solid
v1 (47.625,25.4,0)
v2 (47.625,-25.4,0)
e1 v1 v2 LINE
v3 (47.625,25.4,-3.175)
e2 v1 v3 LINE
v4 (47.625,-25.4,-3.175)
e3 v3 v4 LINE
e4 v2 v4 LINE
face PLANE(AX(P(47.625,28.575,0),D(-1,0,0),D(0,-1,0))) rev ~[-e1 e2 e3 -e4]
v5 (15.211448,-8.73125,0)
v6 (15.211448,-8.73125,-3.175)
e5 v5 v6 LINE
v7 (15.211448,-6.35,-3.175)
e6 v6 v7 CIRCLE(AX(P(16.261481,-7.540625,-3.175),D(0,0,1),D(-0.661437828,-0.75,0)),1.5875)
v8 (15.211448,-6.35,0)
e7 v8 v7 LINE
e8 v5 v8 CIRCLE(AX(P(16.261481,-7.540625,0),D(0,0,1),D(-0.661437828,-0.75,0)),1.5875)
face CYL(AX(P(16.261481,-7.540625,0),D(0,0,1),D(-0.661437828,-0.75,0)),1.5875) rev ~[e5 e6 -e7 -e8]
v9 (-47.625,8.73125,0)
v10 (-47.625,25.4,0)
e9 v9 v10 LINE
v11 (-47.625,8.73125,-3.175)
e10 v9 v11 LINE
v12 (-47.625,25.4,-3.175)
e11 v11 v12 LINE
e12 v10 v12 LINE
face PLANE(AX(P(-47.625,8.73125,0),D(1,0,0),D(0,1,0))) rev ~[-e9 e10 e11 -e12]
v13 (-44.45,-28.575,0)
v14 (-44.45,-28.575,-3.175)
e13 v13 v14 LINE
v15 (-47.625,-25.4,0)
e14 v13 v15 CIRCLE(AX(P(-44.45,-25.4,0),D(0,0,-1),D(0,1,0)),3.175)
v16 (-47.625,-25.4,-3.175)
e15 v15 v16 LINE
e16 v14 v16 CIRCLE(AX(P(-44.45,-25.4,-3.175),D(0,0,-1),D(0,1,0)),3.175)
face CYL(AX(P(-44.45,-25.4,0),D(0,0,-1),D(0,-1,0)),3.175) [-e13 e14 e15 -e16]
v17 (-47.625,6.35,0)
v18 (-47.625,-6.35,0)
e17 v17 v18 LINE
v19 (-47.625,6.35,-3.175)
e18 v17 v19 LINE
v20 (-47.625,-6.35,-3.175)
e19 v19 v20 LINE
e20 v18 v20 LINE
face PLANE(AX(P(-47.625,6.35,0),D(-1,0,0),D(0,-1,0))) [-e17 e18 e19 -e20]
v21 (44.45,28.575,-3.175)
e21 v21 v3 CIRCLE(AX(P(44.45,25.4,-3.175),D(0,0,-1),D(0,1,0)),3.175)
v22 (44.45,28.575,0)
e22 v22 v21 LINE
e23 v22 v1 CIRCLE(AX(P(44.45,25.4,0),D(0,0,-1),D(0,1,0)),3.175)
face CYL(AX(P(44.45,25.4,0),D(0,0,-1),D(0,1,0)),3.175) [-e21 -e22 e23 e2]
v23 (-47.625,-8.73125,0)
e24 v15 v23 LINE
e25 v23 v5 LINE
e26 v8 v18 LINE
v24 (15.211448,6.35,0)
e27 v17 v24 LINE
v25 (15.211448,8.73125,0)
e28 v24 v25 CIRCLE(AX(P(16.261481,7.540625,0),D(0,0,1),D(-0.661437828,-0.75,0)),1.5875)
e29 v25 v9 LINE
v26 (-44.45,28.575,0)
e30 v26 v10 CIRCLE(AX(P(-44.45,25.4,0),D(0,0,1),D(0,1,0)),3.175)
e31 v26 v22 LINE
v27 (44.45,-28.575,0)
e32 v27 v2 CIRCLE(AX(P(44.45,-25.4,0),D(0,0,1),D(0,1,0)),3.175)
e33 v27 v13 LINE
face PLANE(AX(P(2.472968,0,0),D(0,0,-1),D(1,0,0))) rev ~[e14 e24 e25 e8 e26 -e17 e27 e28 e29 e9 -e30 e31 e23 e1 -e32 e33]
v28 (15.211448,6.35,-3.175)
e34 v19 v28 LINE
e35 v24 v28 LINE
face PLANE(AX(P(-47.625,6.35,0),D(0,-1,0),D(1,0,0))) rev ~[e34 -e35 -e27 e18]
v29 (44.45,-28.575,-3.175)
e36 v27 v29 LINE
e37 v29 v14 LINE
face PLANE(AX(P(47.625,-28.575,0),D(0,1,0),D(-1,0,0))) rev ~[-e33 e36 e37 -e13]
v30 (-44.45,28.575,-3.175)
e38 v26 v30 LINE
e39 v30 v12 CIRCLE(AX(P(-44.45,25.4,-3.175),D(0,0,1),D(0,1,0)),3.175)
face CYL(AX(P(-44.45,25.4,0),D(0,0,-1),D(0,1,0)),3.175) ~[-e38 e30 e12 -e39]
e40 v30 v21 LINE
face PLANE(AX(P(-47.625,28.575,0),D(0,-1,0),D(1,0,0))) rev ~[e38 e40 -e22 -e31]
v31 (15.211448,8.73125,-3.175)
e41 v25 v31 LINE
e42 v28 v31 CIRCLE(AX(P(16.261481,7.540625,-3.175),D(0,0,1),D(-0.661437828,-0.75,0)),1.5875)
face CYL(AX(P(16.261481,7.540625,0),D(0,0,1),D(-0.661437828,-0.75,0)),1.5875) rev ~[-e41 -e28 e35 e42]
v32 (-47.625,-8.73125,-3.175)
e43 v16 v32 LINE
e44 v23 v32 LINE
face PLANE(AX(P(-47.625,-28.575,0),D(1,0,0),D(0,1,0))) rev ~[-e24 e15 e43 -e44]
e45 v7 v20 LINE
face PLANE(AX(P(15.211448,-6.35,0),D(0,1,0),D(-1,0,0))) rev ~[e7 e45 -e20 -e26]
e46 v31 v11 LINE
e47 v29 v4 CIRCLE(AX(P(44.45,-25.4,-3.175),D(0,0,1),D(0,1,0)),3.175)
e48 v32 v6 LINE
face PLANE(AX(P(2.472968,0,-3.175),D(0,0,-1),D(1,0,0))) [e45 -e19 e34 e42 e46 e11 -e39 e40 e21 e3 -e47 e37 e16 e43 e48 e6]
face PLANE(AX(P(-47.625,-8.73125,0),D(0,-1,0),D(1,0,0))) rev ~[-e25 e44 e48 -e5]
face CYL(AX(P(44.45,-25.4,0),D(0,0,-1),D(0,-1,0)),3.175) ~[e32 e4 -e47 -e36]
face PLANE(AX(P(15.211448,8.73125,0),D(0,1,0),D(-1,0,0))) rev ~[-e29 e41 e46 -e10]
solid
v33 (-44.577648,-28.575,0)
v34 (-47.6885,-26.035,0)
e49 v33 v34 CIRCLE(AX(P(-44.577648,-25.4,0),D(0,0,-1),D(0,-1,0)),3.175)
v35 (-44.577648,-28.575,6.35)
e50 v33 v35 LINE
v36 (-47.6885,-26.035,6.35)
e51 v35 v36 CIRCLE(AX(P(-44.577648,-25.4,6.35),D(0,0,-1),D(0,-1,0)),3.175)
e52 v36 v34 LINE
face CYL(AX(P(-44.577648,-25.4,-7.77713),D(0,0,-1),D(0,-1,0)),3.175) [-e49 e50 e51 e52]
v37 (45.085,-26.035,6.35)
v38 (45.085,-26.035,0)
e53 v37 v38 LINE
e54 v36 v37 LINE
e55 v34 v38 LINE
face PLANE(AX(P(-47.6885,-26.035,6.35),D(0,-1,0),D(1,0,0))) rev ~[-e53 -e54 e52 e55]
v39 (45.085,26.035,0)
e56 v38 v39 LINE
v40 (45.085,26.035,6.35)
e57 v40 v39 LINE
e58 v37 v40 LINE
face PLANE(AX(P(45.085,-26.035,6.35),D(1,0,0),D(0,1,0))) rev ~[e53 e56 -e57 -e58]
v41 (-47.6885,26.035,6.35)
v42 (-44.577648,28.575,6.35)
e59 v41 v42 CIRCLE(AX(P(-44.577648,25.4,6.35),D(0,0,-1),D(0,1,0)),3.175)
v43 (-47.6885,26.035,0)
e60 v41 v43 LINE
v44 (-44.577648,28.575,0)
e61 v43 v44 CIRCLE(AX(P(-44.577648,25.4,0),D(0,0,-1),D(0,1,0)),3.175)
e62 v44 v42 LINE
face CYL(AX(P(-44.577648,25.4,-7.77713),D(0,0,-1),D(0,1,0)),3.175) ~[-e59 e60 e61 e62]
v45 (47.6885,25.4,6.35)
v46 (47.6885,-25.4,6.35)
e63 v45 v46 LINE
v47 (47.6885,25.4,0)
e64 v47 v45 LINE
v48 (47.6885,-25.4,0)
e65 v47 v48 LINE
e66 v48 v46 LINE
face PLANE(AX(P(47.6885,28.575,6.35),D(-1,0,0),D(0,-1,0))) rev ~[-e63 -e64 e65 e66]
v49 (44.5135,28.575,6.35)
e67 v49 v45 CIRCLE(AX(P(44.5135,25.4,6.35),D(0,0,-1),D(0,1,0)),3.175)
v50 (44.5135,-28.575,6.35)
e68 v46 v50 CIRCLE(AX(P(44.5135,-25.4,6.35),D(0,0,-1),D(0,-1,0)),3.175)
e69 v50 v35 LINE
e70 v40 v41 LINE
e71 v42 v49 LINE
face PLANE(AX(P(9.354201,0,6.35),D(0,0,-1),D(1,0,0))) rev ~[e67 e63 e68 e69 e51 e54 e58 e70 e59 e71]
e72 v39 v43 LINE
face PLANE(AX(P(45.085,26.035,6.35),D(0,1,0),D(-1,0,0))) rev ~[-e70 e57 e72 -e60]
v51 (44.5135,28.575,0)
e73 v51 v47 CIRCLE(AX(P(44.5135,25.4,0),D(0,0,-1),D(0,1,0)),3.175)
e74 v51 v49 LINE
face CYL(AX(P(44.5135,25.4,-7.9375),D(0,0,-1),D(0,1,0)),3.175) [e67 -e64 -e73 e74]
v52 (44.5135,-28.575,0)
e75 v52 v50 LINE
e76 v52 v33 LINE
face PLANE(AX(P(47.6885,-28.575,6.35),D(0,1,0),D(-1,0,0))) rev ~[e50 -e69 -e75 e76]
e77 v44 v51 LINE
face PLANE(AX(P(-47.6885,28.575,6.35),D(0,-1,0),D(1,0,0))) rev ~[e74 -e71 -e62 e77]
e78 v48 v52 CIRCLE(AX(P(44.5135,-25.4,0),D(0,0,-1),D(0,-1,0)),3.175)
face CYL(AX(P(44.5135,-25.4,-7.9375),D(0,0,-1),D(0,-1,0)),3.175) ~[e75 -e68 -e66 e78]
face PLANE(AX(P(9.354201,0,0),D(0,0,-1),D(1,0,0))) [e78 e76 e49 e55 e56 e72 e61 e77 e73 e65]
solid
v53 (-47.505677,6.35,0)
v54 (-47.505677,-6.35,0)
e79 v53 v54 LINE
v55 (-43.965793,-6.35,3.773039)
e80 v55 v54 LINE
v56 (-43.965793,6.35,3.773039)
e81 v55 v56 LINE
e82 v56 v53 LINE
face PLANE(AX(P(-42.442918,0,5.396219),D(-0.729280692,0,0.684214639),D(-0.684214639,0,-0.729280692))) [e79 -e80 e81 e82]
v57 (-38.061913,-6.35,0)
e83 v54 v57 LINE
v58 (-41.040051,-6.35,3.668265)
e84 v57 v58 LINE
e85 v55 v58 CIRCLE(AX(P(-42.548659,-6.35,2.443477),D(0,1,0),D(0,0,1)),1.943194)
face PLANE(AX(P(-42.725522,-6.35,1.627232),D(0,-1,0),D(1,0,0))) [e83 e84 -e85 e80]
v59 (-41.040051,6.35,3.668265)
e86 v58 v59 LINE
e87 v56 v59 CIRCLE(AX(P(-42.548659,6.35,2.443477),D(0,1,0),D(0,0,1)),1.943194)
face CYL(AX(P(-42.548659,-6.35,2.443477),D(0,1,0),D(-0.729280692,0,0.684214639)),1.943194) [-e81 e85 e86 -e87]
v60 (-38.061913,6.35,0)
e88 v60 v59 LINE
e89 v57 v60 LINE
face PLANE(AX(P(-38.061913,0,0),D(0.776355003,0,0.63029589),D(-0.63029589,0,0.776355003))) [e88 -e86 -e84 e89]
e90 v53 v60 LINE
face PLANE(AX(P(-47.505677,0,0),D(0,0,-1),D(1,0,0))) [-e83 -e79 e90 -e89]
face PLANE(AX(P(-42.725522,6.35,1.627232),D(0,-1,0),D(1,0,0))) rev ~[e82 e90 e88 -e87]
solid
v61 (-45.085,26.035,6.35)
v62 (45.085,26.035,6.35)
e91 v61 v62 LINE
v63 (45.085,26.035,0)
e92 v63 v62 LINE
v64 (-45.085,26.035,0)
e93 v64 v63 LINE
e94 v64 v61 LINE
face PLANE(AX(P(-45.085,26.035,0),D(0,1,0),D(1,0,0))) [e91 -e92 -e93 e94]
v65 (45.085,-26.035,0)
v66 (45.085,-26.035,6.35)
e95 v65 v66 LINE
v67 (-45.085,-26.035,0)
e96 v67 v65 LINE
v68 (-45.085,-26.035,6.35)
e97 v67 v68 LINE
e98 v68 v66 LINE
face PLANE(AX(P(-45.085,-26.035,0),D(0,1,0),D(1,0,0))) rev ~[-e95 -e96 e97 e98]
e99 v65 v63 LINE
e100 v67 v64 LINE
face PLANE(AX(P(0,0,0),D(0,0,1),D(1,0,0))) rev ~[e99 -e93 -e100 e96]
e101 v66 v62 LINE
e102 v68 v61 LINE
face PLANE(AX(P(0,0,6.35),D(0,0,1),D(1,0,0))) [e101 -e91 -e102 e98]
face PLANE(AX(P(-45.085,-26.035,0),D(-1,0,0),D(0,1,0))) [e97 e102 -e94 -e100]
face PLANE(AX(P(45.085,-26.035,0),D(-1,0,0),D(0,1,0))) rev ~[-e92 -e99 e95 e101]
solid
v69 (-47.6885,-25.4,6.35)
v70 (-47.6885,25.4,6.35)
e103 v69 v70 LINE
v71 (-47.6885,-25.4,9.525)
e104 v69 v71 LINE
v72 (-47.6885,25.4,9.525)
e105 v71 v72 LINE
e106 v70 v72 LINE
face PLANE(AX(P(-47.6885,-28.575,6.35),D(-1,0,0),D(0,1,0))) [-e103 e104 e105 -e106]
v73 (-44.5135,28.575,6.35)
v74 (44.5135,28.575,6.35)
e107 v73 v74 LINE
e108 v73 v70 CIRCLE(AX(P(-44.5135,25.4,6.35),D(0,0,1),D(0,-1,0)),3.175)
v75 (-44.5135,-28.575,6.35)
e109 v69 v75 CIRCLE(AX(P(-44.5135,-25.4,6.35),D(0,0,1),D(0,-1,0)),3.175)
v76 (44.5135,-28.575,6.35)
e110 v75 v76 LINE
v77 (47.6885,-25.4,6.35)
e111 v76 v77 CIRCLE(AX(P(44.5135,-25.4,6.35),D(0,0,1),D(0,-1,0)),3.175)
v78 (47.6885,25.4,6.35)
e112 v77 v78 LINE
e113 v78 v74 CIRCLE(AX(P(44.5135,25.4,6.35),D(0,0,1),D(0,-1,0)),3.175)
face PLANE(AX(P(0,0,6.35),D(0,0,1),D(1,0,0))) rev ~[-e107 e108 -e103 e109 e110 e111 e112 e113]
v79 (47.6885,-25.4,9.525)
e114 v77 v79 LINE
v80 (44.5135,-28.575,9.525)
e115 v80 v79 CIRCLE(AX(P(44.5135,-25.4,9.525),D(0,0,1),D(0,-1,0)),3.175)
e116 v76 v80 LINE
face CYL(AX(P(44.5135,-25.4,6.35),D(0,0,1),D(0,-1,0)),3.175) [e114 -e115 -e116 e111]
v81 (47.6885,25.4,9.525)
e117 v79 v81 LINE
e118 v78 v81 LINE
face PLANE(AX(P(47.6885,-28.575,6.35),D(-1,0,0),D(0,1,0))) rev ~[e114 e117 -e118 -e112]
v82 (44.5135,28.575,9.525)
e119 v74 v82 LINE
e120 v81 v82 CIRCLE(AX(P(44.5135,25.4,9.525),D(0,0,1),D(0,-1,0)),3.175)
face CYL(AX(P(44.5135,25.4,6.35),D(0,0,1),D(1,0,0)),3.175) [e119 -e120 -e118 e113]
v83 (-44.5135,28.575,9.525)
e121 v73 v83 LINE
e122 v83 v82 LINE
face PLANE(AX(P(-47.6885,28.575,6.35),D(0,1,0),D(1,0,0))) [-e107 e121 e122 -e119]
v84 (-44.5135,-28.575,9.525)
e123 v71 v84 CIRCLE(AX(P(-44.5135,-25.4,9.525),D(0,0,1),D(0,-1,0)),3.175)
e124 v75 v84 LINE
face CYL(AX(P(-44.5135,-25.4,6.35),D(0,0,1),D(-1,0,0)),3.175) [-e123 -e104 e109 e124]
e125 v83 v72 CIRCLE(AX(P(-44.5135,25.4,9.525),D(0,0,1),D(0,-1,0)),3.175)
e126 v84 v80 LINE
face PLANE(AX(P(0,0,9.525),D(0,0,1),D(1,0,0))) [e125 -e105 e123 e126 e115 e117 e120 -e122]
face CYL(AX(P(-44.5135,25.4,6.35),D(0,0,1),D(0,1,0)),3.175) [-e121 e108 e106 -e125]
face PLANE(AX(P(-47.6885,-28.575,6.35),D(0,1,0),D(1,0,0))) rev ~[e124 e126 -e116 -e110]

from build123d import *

# Parameters (mm, degrees)
F0_W           = 90.17
F0_H           = 52.07
F1_DEPTH       = 6.35
F2_W           = 95.377
F2_H           = 57.15
F2_W_2         = 90.17
F2_H_2         = 52.07
F3_DEPTH       = 3.175
F4_W           = 2.54
F4_H           = 12.7
F5_DEPTH       = 3.175
F8_DEPTH       = 6.35
F10_DEPTH      = 6.35
F11_R          = 1.9431941061
F12_F1_R       = 3.175
F12_F2_R       = 3.175
F12_F3_R       = 3.175
F12_F4_R       = 3.175
F12_2_F1_R     = 3.175
F12_2_F2_R     = 3.175
F12_2_F3_R     = 3.175
F12_2_F4_R     = 3.175
F12_3_T1_DEPTH = 21.9042598667
F12_3_T3_DEPTH = 22.225


# Not quite as in the source:
# - a fillet or chamfer that OpenCascade refuses, or shapes differently, is made with other operations: its cross-section is extruded or revolved along the edge and cut away or added


with BuildPart() as f1:
    # F0 (on Top) → F1 (new body)
    with BuildSketch(Plane.XY):
        Rectangle(F0_W, F0_H)
    extrude(amount=F1_DEPTH)


with BuildPart() as f3:
    # F2 (on face) → F3 (new body)
    with BuildSketch(Plane.XY.offset(6.35)):
        Rectangle(F2_W, F2_H)
        Rectangle(F2_W_2, F2_H_2, mode=Mode.SUBTRACT)
        Rectangle(F2_W_2, F2_H_2)
    extrude(amount=F3_DEPTH)

    # F12: fillet of radius 3.175 on 4 edges, made by hand

    # F12_f1
    f12_f1_edges = [f3.edges().sort_by_distance(p)[0] for p in [
        (47.6885, -28.575, 7.9375),
    ]]
    fillet(f12_f1_edges, radius=F12_F1_R)

    # F12_f2
    f12_f2_edges = [f3.edges().sort_by_distance(p)[0] for p in [
        (47.6885, 28.575, 7.9375),
    ]]
    fillet(f12_f2_edges, radius=F12_F2_R)

    # F12_f3
    f12_f3_edges = [f3.edges().sort_by_distance(p)[0] for p in [
        (-47.6885, 28.575, 7.9375),
    ]]
    fillet(f12_f3_edges, radius=F12_F3_R)

    # F12_f4
    f12_f4_edges = [f3.edges().sort_by_distance(p)[0] for p in [
        (-47.6885, -28.575, 7.9375),
    ]]
    fillet(f12_f4_edges, radius=F12_F4_R)


with BuildPart() as f5:
    # F4 (on face) → F5 (new body)
    with BuildSketch(Plane(origin=(0, 0, 0), x_dir=(1, 0, 0), z_dir=(0, 0, -1))):
        Polygon((47.625, 28.575), (-47.625, 28.575), (-47.625, 8.73125), (-45.085, 8.73125), (-45.085, 26.035), (45.085, 26.035), (45.085, -26.035), (-45.085, -26.035), (-45.085, -8.73125), (-47.625, -8.73125), (-47.625, -28.575), (47.625, -28.575), align=None)
        with BuildLine():
            Line((-45.085, 26.035), (-45.085, 8.73125))
            Line((-45.085, 8.73125), (15.2114481971, 8.73125))
            ThreePointArc((15.2114481971, 8.73125), (17.8489807487, 7.540625), (15.2114481971, 6.35))
            Line((15.2114481971, 6.35), (-45.085, 6.35))
            Line((-45.085, 6.35), (-45.085, -6.35))
            Line((-45.085, -6.35), (15.2114481971, -6.35))
            ThreePointArc((15.2114481971, -6.35), (17.8489807487, -7.540625), (15.2114481971, -8.73125))
            Line((15.2114481971, -8.73125), (-45.085, -8.73125))
            Line((-45.085, -8.73125), (-45.085, -26.035))
            Line((-45.085, -26.035), (45.085, -26.035))
            Line((45.085, -26.035), (45.085, 26.035))
            Line((45.085, 26.035), (-45.085, 26.035))
        make_face()
        with Locations((-46.355, 0)):
            Rectangle(F4_W, F4_H)
    extrude(amount=F5_DEPTH)

    # F12#2: fillet of radius 3.175 on 4 edges, made by hand

    # F12_2_f1
    f12_2_f1_edges = [f5.edges().sort_by_distance(p)[0] for p in [
        (47.625, -28.575, -1.5875),
    ]]
    fillet(f12_2_f1_edges, radius=F12_2_F1_R)

    # F12_2_f2
    f12_2_f2_edges = [f5.edges().sort_by_distance(p)[0] for p in [
        (-47.625, -28.575, -1.5875),
    ]]
    fillet(f12_2_f2_edges, radius=F12_2_F2_R)

    # F12_2_f3
    f12_2_f3_edges = [f5.edges().sort_by_distance(p)[0] for p in [
        (-47.625, 28.575, -1.5875),
    ]]
    fillet(f12_2_f3_edges, radius=F12_2_F3_R)

    # F12_2_f4
    f12_2_f4_edges = [f5.edges().sort_by_distance(p)[0] for p in [
        (47.625, 28.575, -1.5875),
    ]]
    fillet(f12_2_f4_edges, radius=F12_2_F4_R)


with BuildPart() as f8:
    # F7 (on face) → F8 (new body, through all)
    with BuildSketch(Plane(origin=(0, 0, 6.35), x_dir=(1, 0, 0), z_dir=(0, 0, -1))):
        Polygon((47.6885, 28.575), (-47.6885, 28.575), (-47.6885, 26.035), (-45.085, 26.035), (45.085, 26.035), (45.085, -26.035), (-45.085, -26.035), (-47.6885, -26.035), (-47.6885, -28.575), (47.6885, -28.575), align=None)
    extrude(amount=F8_DEPTH)

    # F12#3: fillet of radius 3.175 on 4 edges, made by hand

    # F12_3_s2 → F12_3_t1 (cut)
    with BuildSketch(Plane.XY.offset(-7.7771299333)):
        with BuildLine():
            ThreePointArc((-44.5776480267, -28.575), (-46.5856943409, -27.8593444248), (-47.6885, -26.035))
            Line((-47.6885, -26.035), (-47.6885, -28.575))
            Line((-47.6885, -28.575), (-44.5776480267, -28.575))
        make_face()
        with BuildLine():
            ThreePointArc((-44.5776480267, 28.575), (-46.5856943409, 27.8593444248), (-47.6885, 26.035))
            Line((-47.6885, 26.035), (-47.6885, 28.575))
            Line((-47.6885, 28.575), (-44.5776480267, 28.575))
        make_face()
    extrude(amount=F12_3_T1_DEPTH, mode=Mode.SUBTRACT)

    # F12_3_s4 → F12_3_t3 (cut)
    with BuildSketch(Plane.XY.offset(-7.9375)):
        with BuildLine():
            ThreePointArc((44.5135, -28.575), (46.7585640303, -27.6450640303), (47.6885, -25.4))
            Line((47.6885, -25.4), (47.6885, -28.575))
            Line((47.6885, -28.575), (44.5135, -28.575))
        make_face()
        with BuildLine():
            ThreePointArc((44.5135, 28.575), (46.7585640303, 27.6450640303), (47.6885, 25.4))
            Line((47.6885, 25.4), (47.6885, 28.575))
            Line((47.6885, 28.575), (44.5135, 28.575))
        make_face()
    extrude(amount=F12_3_T3_DEPTH, mode=Mode.SUBTRACT)


with BuildPart() as f10:
    # F9 (on Front) → F10 (new body, symmetric)
    with BuildSketch(Plane.XZ):
        Polygon((-42.4429178238, 5.3962194361), (-47.5056767464, 0), (-38.0619131029, 0), align=None)
    extrude(amount=F10_DEPTH, both=True)

    # F11
    f11_edges = [f10.edges().sort_by_distance(p)[0] for p in [
        (-42.442918, 0, 5.396219),
    ]]
    fillet(f11_edges, radius=F11_R)


solid = Compound([f1.part, f3.part, f5.part, f8.part, f10.part])
